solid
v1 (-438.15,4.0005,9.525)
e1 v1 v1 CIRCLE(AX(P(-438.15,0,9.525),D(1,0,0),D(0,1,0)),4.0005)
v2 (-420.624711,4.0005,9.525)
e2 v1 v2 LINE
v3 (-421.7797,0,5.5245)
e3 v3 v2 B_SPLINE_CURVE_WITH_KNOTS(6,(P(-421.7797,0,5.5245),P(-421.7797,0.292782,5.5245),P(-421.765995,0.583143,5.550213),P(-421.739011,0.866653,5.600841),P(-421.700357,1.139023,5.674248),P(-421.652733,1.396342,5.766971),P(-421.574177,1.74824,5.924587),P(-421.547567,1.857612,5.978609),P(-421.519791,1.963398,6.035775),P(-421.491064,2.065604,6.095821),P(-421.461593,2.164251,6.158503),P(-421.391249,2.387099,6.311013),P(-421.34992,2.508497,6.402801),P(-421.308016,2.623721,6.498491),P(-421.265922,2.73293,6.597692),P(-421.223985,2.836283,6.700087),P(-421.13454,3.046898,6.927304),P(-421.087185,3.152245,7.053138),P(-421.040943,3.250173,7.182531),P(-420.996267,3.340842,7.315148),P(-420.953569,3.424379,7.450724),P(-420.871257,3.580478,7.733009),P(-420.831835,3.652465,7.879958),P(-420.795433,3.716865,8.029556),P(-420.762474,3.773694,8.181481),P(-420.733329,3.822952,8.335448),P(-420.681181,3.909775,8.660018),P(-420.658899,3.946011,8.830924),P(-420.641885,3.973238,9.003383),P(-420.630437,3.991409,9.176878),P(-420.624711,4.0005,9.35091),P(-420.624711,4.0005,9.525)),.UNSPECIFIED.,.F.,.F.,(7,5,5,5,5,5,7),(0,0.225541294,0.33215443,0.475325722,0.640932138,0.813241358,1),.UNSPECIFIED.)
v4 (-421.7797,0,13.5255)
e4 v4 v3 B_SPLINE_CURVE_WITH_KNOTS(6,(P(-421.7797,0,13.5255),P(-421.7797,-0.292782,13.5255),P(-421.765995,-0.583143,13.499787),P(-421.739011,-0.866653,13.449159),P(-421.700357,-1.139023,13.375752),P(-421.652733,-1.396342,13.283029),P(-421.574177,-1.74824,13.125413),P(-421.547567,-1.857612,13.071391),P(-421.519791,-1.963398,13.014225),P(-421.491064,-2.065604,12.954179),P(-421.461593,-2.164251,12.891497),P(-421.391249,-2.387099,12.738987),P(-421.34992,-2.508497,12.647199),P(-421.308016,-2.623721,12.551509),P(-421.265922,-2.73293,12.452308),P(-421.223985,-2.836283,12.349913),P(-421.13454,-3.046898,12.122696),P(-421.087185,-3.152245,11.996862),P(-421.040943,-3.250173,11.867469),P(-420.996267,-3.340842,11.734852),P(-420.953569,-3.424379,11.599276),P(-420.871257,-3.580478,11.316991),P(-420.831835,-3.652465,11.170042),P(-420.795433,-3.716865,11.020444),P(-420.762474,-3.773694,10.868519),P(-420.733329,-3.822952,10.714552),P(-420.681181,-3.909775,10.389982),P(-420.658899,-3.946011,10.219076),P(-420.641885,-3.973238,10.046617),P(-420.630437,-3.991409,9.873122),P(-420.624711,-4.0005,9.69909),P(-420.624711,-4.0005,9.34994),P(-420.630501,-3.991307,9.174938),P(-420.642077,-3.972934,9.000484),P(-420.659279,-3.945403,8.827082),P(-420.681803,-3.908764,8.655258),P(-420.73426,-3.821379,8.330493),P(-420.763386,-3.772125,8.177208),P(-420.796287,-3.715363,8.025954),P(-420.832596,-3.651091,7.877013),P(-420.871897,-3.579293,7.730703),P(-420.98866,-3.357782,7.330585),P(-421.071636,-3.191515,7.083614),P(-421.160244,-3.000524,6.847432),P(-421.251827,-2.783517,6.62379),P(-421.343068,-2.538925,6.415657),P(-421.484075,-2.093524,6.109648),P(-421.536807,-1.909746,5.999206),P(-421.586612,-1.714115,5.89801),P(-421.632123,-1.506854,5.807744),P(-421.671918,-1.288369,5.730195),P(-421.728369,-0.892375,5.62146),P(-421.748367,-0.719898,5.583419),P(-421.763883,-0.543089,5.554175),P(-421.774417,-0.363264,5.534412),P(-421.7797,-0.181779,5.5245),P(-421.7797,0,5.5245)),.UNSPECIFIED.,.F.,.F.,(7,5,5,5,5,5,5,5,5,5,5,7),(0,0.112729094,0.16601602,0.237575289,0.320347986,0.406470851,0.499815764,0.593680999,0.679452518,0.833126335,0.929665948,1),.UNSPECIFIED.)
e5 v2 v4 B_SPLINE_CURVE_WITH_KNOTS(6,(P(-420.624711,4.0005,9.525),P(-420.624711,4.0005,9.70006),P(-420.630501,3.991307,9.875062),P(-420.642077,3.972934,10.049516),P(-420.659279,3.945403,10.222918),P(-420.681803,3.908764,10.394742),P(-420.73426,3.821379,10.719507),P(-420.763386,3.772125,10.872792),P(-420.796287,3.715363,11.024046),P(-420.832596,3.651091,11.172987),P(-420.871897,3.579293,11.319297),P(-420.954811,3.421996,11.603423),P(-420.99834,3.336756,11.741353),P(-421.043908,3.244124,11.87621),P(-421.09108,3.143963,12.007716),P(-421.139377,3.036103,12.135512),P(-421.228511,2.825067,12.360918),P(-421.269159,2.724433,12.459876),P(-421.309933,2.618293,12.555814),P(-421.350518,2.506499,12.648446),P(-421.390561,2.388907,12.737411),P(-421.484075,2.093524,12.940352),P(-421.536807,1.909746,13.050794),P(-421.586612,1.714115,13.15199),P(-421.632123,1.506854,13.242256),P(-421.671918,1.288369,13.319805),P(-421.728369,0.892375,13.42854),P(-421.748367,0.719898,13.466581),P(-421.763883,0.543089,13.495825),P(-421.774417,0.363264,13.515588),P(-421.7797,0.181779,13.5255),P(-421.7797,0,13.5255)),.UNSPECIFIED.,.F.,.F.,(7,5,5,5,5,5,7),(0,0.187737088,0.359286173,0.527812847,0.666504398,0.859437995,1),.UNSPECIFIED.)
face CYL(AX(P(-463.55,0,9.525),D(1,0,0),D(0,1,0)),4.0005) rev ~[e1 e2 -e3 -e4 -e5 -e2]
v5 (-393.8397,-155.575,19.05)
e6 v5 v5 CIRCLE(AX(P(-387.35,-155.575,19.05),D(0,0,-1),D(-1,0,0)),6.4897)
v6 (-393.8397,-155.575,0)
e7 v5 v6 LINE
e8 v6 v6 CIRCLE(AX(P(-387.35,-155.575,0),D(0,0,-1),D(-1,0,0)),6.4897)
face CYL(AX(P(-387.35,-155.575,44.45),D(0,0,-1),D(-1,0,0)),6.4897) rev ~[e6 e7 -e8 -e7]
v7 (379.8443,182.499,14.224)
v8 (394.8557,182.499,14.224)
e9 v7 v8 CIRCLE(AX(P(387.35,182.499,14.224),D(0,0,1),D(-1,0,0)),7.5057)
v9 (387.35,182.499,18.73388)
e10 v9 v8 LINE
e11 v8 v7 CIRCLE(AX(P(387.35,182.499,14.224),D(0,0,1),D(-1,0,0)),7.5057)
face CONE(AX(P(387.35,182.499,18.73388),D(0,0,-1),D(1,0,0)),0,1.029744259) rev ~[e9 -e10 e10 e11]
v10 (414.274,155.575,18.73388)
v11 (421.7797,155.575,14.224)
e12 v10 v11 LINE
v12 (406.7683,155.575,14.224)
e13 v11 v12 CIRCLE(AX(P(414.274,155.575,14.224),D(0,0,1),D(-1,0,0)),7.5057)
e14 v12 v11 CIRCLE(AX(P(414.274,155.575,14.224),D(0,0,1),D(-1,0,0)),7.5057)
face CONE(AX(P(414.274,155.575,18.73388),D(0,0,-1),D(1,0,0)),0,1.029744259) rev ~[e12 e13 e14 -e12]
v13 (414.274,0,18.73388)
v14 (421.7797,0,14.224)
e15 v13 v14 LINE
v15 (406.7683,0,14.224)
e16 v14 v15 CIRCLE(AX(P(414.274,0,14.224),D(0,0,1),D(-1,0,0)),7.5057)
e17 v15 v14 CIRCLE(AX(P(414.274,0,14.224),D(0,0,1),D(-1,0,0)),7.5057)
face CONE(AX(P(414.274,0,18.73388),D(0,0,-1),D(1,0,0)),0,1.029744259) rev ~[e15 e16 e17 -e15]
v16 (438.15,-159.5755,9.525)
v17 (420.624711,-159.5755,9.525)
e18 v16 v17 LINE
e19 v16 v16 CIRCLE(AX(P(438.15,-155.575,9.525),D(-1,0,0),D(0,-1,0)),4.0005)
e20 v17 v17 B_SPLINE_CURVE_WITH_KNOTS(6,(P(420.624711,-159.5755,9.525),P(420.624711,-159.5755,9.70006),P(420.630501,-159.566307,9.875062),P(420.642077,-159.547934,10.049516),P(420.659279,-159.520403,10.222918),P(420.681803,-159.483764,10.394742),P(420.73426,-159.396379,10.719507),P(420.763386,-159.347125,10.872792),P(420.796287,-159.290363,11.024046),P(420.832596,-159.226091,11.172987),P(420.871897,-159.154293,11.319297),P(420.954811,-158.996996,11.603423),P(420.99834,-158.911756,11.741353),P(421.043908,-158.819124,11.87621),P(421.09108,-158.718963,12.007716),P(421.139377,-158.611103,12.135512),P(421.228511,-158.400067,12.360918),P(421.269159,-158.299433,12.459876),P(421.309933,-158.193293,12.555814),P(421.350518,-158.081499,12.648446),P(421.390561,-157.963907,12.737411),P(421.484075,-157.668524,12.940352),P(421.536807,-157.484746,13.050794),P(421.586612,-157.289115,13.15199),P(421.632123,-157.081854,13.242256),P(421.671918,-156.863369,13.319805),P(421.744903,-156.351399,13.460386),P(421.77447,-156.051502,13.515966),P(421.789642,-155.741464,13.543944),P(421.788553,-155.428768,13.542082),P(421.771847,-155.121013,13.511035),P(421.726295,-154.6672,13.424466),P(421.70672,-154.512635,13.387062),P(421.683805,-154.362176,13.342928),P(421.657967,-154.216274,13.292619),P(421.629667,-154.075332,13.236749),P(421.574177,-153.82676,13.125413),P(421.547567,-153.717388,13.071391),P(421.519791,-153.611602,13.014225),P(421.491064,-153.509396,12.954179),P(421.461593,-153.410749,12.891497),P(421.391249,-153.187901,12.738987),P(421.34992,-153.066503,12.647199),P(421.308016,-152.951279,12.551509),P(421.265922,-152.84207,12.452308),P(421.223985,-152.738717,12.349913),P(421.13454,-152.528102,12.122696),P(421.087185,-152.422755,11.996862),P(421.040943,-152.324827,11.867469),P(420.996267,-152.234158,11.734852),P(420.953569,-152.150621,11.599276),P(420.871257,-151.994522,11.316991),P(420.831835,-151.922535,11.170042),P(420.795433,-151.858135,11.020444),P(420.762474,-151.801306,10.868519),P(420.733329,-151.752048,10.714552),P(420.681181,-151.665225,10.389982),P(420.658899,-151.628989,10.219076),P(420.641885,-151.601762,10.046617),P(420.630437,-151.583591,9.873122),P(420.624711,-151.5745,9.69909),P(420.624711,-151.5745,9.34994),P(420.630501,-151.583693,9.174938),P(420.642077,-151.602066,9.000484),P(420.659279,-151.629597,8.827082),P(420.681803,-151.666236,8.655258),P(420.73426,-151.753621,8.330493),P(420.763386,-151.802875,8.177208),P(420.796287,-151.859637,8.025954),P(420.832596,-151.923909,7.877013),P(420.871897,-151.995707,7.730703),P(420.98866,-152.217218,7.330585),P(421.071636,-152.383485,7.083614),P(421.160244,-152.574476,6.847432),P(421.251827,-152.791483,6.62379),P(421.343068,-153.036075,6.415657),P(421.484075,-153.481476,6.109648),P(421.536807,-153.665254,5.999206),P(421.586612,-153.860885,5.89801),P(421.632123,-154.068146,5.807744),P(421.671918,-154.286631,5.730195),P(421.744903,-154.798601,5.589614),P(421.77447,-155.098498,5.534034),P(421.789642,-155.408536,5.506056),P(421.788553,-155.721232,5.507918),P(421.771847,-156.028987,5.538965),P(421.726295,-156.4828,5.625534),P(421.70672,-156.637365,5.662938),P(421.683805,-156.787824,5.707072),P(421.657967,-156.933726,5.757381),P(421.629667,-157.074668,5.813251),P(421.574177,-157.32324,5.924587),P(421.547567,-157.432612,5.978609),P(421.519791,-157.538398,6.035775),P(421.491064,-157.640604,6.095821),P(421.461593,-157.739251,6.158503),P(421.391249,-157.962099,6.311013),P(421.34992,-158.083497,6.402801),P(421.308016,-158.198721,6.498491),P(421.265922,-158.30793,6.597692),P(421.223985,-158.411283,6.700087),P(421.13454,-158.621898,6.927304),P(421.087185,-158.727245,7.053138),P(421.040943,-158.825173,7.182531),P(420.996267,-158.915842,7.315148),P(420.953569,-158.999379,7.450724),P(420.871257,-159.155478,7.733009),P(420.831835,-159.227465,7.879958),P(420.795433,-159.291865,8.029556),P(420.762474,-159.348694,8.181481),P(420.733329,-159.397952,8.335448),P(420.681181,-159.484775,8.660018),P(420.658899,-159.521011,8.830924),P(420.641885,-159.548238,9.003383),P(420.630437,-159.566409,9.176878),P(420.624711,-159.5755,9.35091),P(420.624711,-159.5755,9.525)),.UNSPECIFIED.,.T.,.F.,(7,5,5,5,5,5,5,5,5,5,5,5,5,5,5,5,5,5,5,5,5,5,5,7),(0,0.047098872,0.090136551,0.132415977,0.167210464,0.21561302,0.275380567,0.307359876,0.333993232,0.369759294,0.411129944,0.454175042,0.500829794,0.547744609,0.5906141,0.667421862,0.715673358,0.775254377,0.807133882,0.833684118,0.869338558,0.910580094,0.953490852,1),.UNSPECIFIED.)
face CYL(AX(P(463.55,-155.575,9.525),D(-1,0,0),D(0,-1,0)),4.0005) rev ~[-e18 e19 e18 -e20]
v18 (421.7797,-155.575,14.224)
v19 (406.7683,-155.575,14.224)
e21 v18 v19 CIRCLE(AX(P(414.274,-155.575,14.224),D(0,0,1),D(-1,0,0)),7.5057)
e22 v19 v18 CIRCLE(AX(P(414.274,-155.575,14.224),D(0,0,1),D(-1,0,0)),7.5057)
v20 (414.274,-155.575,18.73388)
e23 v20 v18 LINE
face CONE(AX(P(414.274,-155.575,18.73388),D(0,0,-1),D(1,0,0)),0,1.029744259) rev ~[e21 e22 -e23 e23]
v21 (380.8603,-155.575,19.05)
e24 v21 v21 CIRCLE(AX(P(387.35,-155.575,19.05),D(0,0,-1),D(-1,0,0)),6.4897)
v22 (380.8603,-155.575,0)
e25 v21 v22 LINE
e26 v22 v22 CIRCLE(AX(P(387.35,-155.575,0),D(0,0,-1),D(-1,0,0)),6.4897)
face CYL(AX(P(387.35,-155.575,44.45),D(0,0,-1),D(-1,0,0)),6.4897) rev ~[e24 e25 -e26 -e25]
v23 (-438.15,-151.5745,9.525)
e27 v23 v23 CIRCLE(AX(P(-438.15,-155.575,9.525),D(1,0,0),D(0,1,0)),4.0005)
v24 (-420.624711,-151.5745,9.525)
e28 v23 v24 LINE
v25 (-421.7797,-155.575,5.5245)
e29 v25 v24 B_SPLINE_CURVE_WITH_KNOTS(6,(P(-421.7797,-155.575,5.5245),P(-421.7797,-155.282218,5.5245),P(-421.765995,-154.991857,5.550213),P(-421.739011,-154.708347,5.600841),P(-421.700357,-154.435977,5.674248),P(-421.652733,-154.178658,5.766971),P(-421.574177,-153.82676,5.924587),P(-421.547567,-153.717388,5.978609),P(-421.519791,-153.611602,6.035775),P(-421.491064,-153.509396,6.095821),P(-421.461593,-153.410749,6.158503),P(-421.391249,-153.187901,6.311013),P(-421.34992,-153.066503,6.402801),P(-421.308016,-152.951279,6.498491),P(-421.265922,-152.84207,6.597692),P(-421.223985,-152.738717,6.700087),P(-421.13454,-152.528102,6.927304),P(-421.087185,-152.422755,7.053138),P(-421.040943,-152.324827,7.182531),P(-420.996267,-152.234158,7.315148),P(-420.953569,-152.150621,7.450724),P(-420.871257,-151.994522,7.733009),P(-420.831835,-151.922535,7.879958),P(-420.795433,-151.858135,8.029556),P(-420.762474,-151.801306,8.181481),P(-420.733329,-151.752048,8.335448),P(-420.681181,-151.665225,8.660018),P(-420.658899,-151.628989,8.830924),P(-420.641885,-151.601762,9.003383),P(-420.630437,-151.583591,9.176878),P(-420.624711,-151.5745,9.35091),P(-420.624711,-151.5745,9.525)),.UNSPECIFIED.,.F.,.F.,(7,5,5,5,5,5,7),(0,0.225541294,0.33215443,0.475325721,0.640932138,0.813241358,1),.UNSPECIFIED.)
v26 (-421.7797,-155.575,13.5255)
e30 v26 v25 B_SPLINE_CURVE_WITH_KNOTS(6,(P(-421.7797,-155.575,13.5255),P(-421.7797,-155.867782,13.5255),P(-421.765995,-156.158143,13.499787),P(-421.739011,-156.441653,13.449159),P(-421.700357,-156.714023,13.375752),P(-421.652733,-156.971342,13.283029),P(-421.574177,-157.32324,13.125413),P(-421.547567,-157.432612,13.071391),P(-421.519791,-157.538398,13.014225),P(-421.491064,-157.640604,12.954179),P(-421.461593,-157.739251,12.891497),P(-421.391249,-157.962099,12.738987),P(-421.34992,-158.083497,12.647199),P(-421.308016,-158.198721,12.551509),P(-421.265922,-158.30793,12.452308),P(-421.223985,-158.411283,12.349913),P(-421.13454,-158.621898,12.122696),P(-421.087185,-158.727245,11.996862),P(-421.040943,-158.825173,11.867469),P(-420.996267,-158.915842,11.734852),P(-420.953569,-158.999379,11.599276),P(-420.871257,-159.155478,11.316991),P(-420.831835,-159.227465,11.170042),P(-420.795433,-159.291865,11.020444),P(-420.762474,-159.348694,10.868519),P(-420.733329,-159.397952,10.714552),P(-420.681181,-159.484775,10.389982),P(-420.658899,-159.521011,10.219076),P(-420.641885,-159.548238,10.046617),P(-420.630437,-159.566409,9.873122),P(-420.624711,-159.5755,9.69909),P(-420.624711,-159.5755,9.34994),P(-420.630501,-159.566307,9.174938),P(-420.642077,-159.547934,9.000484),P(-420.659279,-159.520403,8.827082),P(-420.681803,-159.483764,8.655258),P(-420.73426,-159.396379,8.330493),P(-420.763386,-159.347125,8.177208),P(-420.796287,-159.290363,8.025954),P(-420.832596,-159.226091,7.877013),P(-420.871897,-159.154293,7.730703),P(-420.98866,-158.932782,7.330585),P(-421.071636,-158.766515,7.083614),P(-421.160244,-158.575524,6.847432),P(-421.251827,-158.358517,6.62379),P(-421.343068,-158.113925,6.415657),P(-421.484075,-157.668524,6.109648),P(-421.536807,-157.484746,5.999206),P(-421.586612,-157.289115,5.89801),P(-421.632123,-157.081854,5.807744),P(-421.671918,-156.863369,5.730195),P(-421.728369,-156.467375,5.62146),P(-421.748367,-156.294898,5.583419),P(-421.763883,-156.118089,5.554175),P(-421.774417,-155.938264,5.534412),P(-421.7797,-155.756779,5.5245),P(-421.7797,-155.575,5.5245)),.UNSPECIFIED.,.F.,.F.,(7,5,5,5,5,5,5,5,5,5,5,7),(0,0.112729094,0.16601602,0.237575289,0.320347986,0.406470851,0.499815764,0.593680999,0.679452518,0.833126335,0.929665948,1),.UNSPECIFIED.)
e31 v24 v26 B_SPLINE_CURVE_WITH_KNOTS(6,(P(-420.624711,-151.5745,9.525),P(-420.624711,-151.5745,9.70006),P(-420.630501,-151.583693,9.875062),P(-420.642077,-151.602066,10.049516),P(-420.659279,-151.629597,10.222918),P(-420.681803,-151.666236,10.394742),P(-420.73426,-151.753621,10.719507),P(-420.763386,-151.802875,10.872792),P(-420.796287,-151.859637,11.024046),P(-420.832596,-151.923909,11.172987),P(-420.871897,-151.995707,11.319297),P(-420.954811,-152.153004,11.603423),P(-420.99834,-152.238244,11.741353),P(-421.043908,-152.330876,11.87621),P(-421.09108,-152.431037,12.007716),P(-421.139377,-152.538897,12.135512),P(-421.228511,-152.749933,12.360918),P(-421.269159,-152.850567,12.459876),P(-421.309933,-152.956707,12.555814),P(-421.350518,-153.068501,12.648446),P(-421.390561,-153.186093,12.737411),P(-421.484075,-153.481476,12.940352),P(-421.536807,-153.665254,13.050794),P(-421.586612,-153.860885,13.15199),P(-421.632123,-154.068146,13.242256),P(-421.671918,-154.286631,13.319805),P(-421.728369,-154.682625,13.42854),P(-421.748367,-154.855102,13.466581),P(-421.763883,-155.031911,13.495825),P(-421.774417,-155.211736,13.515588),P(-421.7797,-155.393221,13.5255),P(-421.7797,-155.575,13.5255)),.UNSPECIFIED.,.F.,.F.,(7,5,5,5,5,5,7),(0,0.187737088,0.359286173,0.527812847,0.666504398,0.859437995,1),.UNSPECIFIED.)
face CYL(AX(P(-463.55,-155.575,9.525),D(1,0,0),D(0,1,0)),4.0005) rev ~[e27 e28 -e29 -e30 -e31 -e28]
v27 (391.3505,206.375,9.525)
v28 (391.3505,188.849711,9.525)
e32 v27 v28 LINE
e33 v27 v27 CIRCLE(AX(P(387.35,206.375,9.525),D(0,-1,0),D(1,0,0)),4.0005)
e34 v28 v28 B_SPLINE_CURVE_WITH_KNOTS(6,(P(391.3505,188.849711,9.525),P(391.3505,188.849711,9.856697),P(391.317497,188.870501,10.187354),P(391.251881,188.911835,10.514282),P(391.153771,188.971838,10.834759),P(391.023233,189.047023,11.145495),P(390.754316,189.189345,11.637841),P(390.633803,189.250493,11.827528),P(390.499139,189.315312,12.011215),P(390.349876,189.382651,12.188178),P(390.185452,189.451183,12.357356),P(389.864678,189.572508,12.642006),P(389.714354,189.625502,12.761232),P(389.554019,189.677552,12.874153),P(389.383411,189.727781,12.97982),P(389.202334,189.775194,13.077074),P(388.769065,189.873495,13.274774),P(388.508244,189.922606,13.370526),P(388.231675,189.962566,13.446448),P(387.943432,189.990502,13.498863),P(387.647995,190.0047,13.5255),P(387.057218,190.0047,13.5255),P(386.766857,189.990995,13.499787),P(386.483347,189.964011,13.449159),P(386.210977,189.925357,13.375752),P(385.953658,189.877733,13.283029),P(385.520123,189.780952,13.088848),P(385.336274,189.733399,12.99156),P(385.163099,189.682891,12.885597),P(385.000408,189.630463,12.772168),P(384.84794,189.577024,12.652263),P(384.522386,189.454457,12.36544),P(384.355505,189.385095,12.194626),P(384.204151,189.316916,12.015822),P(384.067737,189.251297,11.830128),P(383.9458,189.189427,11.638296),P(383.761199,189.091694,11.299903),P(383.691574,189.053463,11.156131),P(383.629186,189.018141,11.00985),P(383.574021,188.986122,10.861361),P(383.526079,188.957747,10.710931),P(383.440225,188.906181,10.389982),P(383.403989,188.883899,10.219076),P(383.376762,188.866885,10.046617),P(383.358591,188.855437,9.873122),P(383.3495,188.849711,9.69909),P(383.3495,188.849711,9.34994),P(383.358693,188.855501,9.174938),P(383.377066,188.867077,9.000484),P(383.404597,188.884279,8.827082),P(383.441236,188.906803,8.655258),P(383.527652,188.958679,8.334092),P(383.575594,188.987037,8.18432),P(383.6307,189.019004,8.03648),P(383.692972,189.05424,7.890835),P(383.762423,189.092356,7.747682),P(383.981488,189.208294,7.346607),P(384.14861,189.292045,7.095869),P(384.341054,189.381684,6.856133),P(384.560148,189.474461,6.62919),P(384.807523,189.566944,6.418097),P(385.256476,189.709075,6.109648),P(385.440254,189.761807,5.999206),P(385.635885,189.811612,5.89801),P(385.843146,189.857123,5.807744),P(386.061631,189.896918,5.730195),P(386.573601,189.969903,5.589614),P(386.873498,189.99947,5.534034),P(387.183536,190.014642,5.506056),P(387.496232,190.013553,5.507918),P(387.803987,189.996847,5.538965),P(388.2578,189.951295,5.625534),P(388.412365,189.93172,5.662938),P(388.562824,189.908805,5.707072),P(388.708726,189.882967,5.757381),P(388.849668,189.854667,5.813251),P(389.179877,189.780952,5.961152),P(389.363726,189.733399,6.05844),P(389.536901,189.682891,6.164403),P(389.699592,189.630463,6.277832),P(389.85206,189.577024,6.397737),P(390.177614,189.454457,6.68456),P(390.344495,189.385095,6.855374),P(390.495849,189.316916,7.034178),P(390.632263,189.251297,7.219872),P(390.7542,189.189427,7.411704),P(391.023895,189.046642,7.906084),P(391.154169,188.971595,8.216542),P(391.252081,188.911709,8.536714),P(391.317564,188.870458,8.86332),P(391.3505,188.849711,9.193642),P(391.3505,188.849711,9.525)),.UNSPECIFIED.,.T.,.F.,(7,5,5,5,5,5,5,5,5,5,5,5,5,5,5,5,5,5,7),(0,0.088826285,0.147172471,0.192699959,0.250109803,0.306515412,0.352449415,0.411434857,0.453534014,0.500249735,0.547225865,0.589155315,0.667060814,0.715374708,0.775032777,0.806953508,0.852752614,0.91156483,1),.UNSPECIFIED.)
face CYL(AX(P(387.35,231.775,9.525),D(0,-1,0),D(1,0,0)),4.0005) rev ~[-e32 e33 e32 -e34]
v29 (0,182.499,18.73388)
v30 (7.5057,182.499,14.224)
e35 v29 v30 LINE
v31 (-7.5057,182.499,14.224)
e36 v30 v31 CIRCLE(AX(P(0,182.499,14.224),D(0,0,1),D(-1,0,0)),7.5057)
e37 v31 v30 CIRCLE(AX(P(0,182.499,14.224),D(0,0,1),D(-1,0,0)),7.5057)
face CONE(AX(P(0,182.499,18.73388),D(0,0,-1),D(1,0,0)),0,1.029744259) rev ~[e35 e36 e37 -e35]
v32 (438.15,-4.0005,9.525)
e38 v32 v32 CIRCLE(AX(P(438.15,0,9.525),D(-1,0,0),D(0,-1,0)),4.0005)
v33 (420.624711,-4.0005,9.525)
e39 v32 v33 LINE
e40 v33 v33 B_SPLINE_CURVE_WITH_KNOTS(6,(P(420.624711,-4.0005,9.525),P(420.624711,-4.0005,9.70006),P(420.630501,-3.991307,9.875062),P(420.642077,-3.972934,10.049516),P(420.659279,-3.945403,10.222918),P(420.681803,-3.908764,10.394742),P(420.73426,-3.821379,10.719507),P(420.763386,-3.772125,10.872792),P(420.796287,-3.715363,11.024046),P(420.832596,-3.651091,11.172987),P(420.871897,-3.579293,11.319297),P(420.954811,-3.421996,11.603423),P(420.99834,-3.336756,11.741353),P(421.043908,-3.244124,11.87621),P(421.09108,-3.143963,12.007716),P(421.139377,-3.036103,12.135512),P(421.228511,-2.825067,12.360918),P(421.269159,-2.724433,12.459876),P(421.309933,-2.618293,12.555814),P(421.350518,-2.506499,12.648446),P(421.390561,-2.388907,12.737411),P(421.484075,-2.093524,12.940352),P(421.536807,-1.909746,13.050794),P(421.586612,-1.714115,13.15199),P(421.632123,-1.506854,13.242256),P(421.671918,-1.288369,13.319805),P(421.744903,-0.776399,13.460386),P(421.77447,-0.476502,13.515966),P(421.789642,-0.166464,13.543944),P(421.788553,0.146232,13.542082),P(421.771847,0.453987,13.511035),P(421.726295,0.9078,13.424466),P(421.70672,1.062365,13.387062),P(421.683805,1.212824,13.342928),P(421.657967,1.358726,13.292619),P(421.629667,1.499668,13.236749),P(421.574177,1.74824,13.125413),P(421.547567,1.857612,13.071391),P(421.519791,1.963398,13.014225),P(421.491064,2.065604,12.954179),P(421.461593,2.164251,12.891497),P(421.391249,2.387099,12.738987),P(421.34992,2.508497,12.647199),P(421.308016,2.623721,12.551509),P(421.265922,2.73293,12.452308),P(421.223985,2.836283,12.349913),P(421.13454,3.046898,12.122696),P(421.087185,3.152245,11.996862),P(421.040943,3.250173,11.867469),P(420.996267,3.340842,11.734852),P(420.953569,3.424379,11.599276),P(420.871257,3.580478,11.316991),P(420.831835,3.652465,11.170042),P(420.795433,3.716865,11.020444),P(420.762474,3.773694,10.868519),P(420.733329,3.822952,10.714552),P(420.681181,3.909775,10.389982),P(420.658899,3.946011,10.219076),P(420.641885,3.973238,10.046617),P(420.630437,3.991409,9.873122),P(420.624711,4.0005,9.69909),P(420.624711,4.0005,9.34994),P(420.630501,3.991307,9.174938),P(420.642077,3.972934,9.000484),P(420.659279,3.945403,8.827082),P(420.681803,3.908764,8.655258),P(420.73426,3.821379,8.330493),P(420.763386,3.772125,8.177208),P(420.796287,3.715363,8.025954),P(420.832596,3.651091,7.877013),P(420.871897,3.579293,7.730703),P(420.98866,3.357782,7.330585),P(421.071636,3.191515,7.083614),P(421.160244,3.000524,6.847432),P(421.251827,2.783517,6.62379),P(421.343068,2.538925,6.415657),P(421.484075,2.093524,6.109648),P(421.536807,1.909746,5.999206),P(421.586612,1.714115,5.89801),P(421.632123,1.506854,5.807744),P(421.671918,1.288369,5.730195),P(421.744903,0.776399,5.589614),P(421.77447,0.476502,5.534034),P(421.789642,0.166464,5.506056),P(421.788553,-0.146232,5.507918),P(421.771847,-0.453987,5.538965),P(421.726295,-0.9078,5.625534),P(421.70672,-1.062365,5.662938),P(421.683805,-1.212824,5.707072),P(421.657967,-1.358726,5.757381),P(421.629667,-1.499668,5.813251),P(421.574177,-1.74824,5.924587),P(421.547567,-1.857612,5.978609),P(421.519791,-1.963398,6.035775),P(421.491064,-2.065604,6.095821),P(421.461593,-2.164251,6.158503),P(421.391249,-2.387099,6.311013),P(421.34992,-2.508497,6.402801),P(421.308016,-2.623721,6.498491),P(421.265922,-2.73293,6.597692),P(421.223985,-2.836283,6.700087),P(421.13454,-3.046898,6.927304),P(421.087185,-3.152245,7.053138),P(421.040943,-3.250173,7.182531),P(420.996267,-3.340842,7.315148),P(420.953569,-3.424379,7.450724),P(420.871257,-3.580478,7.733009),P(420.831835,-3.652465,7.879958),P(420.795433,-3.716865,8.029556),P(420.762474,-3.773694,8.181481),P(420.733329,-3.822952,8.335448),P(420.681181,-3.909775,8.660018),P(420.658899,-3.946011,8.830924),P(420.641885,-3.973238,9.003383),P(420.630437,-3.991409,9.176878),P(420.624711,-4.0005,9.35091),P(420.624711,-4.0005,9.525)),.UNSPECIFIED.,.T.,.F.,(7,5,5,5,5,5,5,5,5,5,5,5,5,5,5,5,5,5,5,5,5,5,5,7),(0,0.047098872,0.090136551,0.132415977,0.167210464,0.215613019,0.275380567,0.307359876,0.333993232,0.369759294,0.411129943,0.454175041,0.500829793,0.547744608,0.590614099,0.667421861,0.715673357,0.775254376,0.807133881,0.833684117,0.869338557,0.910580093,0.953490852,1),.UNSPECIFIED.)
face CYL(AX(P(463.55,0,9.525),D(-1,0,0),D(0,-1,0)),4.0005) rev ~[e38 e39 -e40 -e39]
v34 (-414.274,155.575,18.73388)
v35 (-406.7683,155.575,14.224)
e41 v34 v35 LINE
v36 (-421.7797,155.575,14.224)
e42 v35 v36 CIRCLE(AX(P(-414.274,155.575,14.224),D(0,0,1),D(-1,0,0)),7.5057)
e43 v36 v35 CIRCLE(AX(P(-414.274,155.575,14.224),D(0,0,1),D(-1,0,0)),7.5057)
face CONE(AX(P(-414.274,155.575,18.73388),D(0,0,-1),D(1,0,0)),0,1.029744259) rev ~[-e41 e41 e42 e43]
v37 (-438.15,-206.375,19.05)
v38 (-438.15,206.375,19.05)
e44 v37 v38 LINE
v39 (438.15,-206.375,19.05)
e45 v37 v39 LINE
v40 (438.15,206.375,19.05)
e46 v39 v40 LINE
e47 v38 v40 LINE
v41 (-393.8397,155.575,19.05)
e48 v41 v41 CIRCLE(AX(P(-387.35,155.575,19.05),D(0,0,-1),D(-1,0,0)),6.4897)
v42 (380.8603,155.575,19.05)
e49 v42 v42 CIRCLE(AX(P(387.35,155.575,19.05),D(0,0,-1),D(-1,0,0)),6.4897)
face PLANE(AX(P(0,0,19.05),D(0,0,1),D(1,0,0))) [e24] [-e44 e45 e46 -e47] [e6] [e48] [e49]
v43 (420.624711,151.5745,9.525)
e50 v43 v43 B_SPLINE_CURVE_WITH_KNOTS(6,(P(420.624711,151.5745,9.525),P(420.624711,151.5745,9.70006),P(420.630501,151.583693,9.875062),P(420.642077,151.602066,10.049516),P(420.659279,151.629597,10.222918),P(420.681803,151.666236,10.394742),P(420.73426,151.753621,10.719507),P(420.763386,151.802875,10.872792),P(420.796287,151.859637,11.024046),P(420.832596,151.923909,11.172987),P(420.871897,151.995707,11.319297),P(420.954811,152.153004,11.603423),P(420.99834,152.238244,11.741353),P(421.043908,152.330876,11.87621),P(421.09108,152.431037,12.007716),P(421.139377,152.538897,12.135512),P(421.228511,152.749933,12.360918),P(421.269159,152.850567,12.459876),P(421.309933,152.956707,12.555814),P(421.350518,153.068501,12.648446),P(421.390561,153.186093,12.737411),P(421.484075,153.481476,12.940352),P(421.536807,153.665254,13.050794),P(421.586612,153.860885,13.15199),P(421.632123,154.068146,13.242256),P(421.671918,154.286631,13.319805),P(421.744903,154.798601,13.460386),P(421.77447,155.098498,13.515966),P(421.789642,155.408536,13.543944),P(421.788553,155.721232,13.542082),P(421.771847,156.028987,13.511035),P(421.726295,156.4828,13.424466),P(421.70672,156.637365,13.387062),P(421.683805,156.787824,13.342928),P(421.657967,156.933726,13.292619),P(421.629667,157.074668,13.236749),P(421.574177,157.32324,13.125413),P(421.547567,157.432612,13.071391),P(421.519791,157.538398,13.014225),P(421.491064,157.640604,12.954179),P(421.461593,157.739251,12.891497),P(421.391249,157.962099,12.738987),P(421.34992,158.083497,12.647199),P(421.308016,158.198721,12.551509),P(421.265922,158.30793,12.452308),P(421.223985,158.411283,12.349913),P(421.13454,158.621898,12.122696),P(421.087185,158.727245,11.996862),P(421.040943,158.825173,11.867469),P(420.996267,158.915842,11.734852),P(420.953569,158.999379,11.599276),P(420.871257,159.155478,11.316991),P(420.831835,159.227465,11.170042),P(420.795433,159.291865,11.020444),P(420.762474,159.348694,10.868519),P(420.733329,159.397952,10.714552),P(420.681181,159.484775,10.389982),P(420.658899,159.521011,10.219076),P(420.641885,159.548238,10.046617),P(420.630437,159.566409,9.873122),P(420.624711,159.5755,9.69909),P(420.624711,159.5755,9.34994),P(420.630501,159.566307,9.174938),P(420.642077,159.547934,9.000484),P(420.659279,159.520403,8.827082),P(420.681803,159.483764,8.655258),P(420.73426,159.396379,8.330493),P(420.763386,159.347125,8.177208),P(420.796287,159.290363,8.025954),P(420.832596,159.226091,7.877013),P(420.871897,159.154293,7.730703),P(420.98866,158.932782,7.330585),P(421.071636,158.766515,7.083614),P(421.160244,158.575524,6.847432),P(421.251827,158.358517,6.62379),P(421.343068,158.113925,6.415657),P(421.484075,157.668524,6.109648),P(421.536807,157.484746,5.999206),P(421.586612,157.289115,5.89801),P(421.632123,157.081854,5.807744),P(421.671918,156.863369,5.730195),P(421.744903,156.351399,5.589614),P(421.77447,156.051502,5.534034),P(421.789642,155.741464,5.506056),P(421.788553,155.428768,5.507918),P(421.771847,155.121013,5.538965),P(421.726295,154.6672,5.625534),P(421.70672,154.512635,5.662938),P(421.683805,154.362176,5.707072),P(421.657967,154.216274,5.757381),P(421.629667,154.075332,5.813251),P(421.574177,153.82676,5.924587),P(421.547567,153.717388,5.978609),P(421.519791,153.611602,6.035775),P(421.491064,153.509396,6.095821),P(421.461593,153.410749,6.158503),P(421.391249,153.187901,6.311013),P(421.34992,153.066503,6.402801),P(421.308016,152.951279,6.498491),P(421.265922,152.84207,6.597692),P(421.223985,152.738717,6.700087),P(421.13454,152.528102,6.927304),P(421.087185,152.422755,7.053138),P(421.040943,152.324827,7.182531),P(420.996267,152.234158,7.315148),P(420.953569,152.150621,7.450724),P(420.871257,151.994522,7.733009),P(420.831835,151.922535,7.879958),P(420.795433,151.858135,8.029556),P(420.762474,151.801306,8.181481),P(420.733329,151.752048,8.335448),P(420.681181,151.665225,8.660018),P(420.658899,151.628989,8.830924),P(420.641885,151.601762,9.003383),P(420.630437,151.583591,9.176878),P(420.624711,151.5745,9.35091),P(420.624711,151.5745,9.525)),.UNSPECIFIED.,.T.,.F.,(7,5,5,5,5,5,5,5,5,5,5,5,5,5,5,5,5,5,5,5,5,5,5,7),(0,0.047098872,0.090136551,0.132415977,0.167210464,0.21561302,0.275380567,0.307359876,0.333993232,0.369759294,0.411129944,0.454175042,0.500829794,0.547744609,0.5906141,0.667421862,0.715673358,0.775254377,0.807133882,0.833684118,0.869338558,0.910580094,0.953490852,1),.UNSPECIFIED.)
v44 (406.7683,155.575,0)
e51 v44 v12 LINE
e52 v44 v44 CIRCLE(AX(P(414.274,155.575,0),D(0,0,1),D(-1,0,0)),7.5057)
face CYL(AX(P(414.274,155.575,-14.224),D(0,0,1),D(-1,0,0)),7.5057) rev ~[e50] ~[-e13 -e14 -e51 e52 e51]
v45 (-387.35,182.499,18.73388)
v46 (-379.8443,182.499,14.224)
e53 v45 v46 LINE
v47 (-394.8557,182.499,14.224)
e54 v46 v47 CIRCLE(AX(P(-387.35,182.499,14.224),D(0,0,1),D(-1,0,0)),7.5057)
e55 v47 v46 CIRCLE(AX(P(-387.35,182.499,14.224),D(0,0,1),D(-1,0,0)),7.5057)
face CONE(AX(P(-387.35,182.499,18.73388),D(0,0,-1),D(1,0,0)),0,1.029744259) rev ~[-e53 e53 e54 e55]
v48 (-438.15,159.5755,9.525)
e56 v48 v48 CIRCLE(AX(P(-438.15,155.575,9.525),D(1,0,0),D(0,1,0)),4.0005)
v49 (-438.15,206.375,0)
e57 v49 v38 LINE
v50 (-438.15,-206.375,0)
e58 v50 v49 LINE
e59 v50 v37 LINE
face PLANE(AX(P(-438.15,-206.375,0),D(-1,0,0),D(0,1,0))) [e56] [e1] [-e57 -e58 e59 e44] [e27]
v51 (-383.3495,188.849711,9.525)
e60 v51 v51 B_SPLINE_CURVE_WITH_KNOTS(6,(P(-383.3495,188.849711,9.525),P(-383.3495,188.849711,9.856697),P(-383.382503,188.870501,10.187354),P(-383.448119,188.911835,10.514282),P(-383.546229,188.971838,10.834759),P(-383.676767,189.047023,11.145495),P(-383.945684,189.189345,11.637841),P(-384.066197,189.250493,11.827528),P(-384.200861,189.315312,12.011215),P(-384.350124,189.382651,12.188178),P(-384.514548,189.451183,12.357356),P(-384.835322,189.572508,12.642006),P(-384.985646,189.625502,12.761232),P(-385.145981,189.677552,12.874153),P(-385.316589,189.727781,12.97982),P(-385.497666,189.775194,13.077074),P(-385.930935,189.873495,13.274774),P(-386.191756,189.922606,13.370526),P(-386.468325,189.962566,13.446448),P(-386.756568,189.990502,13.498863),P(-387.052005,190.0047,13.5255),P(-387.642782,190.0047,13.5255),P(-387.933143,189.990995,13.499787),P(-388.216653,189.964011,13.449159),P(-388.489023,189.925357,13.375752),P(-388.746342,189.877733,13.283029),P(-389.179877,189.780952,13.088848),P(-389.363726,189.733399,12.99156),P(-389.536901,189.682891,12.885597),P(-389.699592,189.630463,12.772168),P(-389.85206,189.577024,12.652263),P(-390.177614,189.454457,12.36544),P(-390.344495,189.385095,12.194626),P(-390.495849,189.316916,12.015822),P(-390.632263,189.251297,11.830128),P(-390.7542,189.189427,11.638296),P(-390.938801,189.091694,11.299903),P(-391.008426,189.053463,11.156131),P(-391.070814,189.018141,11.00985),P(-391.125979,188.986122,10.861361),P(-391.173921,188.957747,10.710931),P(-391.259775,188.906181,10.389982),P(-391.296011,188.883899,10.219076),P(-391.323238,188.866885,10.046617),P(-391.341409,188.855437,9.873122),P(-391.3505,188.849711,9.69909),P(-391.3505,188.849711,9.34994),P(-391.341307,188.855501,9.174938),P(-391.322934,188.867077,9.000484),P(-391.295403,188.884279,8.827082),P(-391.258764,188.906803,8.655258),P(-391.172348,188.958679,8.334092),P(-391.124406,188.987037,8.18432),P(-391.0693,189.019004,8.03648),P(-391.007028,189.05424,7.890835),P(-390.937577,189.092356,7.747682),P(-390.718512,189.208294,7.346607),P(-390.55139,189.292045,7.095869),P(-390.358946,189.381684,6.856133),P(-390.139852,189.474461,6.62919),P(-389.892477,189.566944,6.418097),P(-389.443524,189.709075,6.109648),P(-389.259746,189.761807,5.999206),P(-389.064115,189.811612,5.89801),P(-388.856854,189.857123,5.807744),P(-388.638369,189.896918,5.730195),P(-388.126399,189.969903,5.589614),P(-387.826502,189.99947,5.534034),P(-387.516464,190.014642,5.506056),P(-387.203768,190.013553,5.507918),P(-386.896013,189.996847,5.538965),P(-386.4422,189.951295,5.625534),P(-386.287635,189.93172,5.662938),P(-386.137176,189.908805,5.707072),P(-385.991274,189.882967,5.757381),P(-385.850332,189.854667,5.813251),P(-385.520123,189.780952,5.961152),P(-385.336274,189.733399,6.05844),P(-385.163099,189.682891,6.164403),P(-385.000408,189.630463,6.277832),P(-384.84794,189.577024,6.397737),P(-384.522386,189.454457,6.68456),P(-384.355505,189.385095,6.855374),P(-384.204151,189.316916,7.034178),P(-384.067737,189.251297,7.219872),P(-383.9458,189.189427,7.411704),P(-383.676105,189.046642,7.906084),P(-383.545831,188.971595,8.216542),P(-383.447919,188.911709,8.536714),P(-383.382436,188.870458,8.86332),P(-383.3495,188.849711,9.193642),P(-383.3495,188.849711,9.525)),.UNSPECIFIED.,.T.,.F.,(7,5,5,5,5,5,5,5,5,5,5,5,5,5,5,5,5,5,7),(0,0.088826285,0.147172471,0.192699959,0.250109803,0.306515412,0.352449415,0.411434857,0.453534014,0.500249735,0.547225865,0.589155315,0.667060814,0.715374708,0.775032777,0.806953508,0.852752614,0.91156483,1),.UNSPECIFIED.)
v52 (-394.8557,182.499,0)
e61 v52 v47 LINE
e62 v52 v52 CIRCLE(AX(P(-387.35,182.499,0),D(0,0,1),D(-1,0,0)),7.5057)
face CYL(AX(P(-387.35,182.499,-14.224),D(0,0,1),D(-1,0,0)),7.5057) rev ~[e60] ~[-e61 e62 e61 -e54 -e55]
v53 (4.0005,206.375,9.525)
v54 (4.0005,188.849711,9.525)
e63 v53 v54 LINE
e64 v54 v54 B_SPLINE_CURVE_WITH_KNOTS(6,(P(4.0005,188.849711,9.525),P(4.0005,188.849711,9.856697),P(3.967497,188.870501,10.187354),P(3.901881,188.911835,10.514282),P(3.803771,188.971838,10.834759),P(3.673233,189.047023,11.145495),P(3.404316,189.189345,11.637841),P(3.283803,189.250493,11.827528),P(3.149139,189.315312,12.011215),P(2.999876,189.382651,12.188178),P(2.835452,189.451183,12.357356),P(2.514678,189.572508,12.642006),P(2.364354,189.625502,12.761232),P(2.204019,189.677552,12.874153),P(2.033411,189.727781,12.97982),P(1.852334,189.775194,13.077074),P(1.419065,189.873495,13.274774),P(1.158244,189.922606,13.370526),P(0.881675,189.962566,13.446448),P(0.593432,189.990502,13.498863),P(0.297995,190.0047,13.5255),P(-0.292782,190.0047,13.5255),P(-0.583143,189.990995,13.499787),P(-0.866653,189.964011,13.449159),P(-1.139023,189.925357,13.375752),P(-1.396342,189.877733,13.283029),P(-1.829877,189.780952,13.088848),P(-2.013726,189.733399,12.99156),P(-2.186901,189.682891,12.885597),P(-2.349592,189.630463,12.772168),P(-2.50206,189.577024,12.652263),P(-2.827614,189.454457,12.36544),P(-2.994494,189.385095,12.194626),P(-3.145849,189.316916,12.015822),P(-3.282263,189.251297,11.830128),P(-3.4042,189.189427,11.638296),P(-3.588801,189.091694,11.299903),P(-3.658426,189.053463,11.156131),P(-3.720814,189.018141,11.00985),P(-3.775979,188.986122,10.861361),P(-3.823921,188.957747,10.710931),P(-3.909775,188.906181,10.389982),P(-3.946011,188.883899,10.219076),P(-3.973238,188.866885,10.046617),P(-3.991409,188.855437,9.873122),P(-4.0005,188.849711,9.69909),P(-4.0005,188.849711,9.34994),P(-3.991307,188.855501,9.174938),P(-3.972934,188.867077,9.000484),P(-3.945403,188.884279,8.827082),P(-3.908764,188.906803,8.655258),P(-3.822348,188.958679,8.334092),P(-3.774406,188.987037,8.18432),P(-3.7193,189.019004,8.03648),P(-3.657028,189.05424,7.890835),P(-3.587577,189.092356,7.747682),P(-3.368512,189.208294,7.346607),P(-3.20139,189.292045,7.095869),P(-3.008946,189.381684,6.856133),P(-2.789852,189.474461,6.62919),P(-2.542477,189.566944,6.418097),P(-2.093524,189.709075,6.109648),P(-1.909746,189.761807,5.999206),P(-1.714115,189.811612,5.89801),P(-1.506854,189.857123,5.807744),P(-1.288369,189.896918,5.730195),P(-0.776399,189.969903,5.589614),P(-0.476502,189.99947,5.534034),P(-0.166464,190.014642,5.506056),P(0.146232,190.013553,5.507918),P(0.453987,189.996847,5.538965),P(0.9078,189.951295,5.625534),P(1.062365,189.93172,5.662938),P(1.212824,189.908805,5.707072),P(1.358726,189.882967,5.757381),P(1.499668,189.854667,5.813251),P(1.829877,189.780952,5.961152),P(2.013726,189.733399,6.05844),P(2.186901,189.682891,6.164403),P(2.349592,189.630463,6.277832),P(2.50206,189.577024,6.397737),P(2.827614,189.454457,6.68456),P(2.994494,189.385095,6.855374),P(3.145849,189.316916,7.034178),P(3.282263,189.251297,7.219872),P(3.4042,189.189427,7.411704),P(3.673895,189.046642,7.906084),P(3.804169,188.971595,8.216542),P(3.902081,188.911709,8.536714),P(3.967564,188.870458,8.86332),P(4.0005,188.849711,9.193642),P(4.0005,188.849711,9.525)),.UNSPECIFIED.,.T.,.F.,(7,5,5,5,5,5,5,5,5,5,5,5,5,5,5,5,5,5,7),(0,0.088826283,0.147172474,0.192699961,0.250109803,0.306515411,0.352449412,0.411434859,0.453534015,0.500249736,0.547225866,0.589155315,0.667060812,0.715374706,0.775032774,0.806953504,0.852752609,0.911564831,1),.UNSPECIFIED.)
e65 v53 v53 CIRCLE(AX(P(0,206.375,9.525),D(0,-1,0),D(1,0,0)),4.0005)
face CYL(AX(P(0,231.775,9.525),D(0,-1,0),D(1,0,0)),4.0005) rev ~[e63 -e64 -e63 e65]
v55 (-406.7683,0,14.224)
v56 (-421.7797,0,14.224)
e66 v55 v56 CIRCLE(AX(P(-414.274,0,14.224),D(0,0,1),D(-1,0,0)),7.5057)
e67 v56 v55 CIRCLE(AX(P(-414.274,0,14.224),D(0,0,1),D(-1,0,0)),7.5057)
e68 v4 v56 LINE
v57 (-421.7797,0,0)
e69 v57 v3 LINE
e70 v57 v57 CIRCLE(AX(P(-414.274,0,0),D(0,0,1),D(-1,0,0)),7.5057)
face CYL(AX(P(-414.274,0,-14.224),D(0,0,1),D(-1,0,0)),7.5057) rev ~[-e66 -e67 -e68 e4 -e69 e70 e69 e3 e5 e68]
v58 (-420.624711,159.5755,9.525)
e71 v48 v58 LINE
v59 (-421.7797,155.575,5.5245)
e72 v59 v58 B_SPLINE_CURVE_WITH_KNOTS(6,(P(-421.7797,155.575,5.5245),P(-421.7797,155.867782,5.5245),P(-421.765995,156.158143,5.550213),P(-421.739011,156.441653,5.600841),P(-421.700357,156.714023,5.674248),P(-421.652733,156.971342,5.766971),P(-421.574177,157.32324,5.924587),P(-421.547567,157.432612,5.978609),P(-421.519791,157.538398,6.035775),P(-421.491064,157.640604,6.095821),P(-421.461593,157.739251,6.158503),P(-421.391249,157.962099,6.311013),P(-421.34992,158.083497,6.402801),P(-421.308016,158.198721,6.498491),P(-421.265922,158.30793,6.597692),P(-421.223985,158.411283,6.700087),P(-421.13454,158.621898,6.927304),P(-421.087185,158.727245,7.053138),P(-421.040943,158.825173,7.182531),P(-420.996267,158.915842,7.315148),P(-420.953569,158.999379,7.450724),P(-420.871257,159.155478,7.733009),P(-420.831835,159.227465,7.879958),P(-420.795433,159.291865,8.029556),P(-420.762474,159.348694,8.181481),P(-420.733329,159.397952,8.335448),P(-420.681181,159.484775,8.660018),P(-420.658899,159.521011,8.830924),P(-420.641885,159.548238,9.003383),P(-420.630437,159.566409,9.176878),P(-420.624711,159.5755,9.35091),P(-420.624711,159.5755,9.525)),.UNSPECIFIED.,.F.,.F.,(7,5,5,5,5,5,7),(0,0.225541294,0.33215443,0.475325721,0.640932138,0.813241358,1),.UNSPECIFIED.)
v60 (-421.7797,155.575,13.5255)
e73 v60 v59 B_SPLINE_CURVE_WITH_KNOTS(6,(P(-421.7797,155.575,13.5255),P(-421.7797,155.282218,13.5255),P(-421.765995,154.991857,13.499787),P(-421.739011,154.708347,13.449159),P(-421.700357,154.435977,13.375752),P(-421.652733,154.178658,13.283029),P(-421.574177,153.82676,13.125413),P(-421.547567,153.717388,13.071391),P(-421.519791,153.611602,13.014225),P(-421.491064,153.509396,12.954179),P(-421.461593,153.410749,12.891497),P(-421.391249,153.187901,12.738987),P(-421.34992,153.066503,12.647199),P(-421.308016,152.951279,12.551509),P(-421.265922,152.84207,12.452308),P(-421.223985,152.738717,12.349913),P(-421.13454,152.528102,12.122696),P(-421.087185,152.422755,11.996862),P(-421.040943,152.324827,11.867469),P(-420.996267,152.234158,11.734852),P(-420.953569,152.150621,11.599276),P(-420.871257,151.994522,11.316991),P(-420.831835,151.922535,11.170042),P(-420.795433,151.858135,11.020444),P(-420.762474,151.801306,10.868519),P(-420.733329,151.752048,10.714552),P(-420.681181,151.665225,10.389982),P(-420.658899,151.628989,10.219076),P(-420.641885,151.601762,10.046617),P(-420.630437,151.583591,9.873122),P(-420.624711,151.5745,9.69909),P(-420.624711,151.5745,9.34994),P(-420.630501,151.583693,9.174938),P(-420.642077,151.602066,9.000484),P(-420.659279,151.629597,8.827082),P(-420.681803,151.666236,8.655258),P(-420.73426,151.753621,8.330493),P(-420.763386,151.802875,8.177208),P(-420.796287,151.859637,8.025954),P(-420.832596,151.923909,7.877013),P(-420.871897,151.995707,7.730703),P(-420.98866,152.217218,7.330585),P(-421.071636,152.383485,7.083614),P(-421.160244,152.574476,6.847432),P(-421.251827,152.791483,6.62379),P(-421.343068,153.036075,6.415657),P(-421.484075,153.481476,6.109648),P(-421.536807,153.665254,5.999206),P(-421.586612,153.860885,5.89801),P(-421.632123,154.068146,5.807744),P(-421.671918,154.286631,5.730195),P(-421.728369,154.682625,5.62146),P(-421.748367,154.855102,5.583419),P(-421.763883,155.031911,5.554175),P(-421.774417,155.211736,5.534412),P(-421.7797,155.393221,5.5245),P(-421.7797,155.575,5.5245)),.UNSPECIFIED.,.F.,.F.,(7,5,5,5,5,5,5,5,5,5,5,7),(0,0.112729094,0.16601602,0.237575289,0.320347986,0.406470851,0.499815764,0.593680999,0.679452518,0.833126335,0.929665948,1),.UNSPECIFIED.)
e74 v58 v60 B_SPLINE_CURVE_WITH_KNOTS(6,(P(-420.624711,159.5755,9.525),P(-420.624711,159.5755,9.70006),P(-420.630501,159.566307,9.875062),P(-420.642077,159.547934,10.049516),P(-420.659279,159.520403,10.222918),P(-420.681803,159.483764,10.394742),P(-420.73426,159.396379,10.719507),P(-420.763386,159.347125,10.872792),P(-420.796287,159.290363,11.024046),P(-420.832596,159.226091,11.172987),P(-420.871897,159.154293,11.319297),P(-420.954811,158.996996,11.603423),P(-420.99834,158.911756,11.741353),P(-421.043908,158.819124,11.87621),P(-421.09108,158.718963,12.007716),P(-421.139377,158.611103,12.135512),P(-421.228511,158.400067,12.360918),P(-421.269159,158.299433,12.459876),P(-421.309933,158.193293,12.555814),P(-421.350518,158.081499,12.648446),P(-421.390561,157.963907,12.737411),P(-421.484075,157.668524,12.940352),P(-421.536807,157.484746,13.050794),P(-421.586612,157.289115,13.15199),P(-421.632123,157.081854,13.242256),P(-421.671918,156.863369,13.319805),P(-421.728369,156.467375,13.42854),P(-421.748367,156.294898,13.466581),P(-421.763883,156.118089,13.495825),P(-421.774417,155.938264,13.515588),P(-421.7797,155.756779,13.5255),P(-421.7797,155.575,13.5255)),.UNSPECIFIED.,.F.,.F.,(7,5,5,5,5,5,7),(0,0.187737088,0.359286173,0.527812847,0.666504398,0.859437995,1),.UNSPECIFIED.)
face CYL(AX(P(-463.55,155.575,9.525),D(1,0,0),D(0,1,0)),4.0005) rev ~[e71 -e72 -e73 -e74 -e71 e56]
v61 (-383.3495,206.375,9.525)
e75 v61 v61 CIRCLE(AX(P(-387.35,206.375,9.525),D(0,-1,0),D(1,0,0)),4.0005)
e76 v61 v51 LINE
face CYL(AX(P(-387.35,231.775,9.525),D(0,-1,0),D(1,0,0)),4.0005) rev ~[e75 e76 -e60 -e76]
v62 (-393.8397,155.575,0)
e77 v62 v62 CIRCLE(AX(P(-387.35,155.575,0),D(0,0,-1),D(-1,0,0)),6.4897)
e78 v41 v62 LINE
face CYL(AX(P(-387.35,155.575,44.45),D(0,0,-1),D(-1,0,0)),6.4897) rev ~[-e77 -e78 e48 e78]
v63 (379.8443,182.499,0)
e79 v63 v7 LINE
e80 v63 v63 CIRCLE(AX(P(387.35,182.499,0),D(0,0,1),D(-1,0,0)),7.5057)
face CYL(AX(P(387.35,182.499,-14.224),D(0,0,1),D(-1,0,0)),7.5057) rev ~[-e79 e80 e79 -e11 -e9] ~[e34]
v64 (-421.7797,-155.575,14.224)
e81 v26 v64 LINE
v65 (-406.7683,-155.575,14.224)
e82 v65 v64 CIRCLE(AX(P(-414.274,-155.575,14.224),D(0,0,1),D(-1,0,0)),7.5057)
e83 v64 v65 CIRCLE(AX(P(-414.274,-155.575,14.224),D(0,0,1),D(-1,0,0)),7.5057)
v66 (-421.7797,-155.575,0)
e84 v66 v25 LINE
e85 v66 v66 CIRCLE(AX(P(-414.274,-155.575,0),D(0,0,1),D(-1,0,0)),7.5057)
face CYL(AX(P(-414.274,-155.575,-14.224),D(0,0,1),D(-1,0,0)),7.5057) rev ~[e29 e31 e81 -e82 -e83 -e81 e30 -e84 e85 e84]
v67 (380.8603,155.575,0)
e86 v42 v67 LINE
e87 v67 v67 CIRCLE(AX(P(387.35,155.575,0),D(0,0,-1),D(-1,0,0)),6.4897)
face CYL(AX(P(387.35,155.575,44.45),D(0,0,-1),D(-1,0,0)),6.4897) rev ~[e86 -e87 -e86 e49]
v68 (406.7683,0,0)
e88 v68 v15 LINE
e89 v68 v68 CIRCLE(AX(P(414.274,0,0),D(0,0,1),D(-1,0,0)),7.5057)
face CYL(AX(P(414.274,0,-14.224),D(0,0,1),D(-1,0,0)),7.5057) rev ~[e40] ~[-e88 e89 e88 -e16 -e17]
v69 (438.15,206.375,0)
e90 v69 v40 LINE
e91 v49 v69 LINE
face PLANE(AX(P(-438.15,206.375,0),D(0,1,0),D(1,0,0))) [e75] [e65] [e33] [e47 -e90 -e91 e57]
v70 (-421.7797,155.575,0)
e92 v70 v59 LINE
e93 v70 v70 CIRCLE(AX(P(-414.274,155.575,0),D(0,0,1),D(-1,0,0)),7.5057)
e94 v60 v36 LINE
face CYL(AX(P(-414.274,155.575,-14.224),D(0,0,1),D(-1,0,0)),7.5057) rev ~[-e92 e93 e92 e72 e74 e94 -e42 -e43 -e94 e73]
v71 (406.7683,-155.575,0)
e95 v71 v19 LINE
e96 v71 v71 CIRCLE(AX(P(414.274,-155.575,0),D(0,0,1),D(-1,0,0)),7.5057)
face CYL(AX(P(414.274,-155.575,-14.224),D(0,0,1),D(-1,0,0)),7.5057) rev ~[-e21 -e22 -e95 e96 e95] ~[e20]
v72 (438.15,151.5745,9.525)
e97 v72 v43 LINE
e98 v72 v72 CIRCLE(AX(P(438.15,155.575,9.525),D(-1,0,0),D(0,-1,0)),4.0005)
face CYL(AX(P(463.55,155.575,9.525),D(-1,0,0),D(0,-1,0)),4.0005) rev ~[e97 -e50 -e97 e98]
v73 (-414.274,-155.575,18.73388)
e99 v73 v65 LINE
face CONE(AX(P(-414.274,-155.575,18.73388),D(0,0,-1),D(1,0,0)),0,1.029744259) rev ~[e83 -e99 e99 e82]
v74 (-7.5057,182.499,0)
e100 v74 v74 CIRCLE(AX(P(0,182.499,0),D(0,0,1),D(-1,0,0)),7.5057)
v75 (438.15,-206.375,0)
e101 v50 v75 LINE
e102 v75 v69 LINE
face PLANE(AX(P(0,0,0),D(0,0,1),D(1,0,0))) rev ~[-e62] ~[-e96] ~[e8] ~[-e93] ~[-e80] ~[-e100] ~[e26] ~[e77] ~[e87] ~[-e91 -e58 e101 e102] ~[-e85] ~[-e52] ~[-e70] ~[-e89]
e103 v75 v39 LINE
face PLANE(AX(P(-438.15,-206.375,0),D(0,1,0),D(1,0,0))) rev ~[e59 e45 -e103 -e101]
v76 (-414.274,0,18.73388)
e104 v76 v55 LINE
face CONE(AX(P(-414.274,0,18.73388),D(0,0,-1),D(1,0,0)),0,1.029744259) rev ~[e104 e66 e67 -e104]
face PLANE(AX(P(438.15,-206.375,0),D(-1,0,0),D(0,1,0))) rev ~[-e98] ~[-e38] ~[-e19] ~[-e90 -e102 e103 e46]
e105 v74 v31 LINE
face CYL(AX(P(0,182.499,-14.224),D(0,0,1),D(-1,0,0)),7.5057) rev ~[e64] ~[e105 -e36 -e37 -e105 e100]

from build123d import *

# Parameters (mm, degrees)
F0_W      = 876.3
F0_H      = 412.75
F1_DEPTH  = 19.05
F3_D      = 15.0114
F3_DEPTH  = 14.224
F3_TIP    = 4.5098795482
F5_D      = 8.001
F5_DEPTH  = 25.4
F5_TIP    = 2.4037429064
F7_D      = 8.001
F7_DEPTH  = 25.4
F7_TIP    = 2.4037429064
F9_D      = 8.001
F9_DEPTH  = 25.4
F9_TIP    = 2.4037429064
F11_D     = 12.9794
F11_DEPTH = 25.4
F11_TIP   = 3.8994051593


with BuildPart() as f1:
    # F0 (on Top) → F1 (new body)
    with BuildSketch(Plane.XY):
        Rectangle(F0_W, F0_H)
    extrude(amount=F1_DEPTH)

    # F3
    with Locations(Plane(origin=(0, 0, 0), x_dir=(1, 0, 0), z_dir=(0, 0, -1))):
        with Locations((-414.274, 155.575), (-414.274, 0), (-414.274, -155.575), (-387.35, -182.499), (0, -182.499), (387.35, -182.499), (414.274, -155.575), (414.274, 0), (414.274, 155.575)):
            Hole(F3_D / 2, depth=F3_DEPTH)
            with Locations((0, 0, -(F3_DEPTH + F3_TIP / 2))):  # 118° drill point
                Cone(0, F3_D / 2, F3_TIP, mode=Mode.SUBTRACT)

    # F5
    with Locations(Plane(origin=(0, 206.375, 0), x_dir=(-1, 0, 0), z_dir=(0, 1, 0))):
        with Locations((-387.35, 9.525), (0, 9.525), (387.35, 9.525)):
            Hole(F5_D / 2, depth=F5_DEPTH)
            with Locations((0, 0, -(F5_DEPTH + F5_TIP / 2))):  # 118° drill point
                Cone(0, F5_D / 2, F5_TIP, mode=Mode.SUBTRACT)

    # F7
    with Locations(Plane(origin=(-438.15, 0, 0), x_dir=(0, -1, 0), z_dir=(-1, 0, 0))):
        with Locations((-155.575, 9.525), (0, 9.525), (155.575, 9.525)):
            Hole(F7_D / 2, depth=F7_DEPTH)
            with Locations((0, 0, -(F7_DEPTH + F7_TIP / 2))):  # 118° drill point
                Cone(0, F7_D / 2, F7_TIP, mode=Mode.SUBTRACT)

    # F9
    with Locations(Plane.YZ.offset(438.15)):
        with Locations((-155.575, 9.525), (0, 9.525), (155.575, 9.525)):
            Hole(F9_D / 2, depth=F9_DEPTH)
            with Locations((0, 0, -(F9_DEPTH + F9_TIP / 2))):  # 118° drill point
                Cone(0, F9_D / 2, F9_TIP, mode=Mode.SUBTRACT)

    # F11
    with Locations(Plane.XY.offset(19.05)):
        with Locations((-387.35, 155.575), (387.35, 155.575), (387.35, -155.575), (-387.35, -155.575)):
            Hole(F11_D / 2, depth=F11_DEPTH)
            with Locations((0, 0, -(F11_DEPTH + F11_TIP / 2))):  # 118° drill point
                Cone(0, F11_D / 2, F11_TIP, mode=Mode.SUBTRACT)


solid = f1.part
